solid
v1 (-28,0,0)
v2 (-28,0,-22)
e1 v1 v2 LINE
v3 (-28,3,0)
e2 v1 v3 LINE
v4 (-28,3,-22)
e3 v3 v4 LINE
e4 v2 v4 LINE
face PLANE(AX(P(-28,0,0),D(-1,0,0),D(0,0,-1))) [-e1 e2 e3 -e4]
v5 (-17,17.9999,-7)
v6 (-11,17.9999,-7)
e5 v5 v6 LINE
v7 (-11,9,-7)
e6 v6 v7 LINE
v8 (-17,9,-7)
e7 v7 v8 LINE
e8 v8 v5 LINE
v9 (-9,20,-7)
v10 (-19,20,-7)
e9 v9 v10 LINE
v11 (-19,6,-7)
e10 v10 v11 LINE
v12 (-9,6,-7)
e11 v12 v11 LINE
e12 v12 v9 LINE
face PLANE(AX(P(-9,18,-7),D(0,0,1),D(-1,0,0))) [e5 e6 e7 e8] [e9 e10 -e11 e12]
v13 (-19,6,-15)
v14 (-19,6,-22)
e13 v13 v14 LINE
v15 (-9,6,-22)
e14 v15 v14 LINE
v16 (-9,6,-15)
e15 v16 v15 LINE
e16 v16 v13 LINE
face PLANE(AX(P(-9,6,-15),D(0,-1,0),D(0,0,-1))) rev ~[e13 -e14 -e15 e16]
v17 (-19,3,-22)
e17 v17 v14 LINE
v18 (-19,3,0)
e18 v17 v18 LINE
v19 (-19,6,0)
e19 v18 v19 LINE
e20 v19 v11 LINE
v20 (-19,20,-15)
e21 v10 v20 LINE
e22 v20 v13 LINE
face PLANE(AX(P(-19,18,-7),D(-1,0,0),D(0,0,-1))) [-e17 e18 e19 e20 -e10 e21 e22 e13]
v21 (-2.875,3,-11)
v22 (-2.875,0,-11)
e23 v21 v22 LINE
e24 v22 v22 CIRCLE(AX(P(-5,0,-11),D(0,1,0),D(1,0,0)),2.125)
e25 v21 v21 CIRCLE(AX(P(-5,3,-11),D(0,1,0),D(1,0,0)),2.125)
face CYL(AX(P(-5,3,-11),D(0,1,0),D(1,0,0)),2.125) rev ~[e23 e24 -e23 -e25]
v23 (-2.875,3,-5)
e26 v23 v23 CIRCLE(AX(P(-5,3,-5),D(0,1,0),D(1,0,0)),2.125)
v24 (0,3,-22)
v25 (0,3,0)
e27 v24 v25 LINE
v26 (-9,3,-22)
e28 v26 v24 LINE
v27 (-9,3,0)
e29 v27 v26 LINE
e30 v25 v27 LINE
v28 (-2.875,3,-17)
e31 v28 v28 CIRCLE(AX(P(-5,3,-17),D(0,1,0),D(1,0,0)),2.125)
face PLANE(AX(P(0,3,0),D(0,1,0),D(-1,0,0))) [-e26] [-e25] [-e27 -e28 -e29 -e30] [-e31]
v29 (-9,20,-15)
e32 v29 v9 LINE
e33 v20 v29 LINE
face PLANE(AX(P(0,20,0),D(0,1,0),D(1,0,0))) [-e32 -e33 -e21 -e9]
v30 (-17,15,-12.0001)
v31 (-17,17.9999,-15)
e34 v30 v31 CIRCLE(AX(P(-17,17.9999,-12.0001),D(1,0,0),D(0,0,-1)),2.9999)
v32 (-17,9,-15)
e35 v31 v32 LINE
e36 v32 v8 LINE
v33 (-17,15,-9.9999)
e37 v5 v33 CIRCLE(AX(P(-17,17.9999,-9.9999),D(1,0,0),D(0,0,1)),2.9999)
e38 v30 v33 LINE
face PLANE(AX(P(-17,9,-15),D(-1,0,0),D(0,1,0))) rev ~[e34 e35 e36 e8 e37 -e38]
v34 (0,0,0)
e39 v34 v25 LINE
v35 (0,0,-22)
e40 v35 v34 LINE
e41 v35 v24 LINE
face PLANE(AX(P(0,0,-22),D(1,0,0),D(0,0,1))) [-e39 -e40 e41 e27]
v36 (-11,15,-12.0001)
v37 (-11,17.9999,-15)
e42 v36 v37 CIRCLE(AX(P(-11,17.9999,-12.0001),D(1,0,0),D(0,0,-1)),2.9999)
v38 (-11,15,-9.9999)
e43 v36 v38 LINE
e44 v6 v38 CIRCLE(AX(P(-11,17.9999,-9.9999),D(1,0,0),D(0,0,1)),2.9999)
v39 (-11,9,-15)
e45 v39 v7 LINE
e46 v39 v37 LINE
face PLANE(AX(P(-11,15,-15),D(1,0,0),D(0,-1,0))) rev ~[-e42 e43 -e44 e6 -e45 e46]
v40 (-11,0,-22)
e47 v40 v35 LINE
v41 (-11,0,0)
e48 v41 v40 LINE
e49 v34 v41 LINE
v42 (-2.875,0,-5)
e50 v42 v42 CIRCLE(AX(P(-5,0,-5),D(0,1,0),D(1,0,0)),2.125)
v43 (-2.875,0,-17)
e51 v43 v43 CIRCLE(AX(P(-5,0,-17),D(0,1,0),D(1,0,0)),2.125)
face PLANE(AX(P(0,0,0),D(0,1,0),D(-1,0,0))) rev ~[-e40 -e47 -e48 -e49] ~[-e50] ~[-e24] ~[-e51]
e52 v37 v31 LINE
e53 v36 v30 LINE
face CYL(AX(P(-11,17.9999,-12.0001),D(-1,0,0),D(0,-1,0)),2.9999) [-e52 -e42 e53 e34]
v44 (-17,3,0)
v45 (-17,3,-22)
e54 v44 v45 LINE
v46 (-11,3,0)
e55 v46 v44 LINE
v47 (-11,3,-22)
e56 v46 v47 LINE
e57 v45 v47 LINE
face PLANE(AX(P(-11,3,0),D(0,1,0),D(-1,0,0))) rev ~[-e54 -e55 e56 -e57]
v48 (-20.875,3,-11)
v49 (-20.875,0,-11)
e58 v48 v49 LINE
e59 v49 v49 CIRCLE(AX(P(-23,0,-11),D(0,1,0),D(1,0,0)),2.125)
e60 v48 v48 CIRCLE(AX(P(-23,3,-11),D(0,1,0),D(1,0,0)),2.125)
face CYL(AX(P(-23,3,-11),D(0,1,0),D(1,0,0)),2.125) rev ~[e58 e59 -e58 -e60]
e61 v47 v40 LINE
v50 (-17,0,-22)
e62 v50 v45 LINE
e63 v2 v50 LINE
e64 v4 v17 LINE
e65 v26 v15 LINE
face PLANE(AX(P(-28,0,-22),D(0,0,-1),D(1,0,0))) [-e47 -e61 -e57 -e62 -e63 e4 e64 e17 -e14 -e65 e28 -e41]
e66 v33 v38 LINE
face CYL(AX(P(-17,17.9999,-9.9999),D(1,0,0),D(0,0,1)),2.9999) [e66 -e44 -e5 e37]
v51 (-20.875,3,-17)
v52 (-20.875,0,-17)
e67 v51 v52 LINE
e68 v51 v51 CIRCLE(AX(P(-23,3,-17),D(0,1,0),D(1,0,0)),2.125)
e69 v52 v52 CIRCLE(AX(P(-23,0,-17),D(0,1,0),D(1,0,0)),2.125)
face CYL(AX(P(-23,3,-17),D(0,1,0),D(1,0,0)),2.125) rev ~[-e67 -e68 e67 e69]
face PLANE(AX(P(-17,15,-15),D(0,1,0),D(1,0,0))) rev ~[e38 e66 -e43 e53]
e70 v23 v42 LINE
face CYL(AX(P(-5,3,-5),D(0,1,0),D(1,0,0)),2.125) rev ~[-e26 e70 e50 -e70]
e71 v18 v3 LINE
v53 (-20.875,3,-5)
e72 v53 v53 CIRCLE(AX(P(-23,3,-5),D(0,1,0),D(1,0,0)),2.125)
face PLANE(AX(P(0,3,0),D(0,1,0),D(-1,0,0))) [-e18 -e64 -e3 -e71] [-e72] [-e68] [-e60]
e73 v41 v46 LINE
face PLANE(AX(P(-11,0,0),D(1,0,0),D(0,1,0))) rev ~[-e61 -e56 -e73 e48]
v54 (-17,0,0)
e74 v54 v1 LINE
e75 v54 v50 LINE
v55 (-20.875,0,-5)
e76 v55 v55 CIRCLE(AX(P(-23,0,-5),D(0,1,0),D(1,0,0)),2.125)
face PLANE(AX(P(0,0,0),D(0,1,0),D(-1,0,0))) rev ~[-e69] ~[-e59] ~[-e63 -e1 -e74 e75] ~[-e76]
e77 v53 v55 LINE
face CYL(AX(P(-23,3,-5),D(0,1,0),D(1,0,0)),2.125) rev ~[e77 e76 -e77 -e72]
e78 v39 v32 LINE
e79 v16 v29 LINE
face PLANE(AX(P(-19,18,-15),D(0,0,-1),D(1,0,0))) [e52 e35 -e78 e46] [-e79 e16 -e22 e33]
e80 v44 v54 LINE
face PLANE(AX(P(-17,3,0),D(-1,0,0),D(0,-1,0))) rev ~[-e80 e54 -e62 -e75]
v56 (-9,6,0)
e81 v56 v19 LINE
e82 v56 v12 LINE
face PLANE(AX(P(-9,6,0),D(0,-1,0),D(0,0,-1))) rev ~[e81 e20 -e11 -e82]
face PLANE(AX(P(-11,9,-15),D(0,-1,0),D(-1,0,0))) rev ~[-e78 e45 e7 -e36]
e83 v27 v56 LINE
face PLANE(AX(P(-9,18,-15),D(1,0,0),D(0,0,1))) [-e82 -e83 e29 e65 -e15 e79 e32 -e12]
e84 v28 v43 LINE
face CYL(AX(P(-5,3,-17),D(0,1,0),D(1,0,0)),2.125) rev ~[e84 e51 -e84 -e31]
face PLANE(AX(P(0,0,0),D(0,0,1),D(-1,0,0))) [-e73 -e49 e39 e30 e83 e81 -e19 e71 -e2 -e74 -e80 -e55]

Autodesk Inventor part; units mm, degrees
ref_plane "YZ Plane" through (0, 0, 0) normal (1, 0, 0) x (0, 1, 0)
ref_plane "XZ Plane" through (0, 0, 0) normal (0, 1, 0) x (-1, 0, 0)
ref_plane "XY Plane" through (0, 0, 0) normal (0, 0, 1) x (1, 0, 0)
sketch "Sketch1" plane through (0, 0, 0) normal (0, 1, 0) x (-1, 0, 0)
  line L0 (0, 0) -> (28, 0)
  line L1 (28, 0) -> (28, -22)
  line L2 (28, -22) -> (0, -22)
  line L3 (0, -22) -> (0, 0)
  dimension "d0" = 28
  dimension "d1" = 22
extrude "Extrusion1" add sketch "Sketch1" along normal blind 3
sketch "Sketch2" plane through (0, 3, 0) normal (0, 1, 0) x (1, 0, 0)
  line L0 (-17, 7) -> (-11, 7)
  line L1 (-11, 7) -> (-11, 15)
  line L2 (-11, 15) -> (-17, 15)
  line L3 (-17, 15) -> (-17, 7)
  line L4 (-17, 7) -> (-11, 15) construction
  line L5 (-11, 7) -> (-17, 15) construction
  point P0 (0, 0)
  point P1 (-14, 11)
  dimension "d4" = 6
  dimension "d5" = 8
sketch "Sketch3" plane through (0, 3, 0) normal (0, 1, 0) x (1, 0, 0)
  line L0 (-28, 22) -> (-28, 0) projected
  line L1 (-28, 11) -> (-23, 11)
  line L2 (0, 0) -> (0, 22) projected
  line L3 (0, 11) -> (-5, 11)
  circle A0 centre (-5, 11) radius 2.125
  dimension "d6" = 5
  dimension "d7" = 5
  dimension "d8" = 4.25
extrude "Extrusion2" cut sketch "Sketch3" against normal through all
pattern_linear "Rectangular Pattern1" count 3 spacing 6 along (0, 0, 1) count 2 spacing 18 along (-1, 0, 0) of "Extrusion2" first direction both ways yes
sketch "Sketch5" plane through (0, 3, 0) normal (0, 1, 0) x (1, 0, 0)
  line L0 (0, 22) -> (-28, 22) projected
  line L1 (-19, 0) -> (-9, 0)
  line L2 (-9, 0) -> (-9, 22)
  line L3 (-9, 22) -> (-19, 22)
  line L4 (-19, 22) -> (-19, 0)
  line L5 (-19, 0) -> (-9, 22) construction
  line L6 (-9, 0) -> (-19, 22) construction
  point P0 (0, 0)
  point P1 (-14, 11)
  dimension "d17" = 10
extrude "Extrusion3" add sketch "Sketch5" along normal blind 15
sketch "Sketch6" plane through (-28, 0, 0) normal (0, 0, 1) x (1, 0, 0)
  line L0 (19, 3) -> (17, 3)
  line L1 (9, 3) -> (9, 18) projected
  line L2 (9, 3) -> (11, 3)
  line L3 (0, 0) -> (28, 0) projected
  line L4 (17, 3) -> (11, 3)
  line L5 (11, 3) -> (11, 0)
  line L6 (11, 0) -> (17, 0)
  line L7 (17, 0) -> (17, 3)
  dimension "d20" = 2
  dimension "d21" = 2
extrude "Extrusion4" cut sketch "Sketch6" against normal through all
sketch "Sketch7" plane through (-9, 3, 0) normal (1, 0, 0) x (0, 0, -1)
  line L0 (0, 15) -> (7, 15)
  line L1 (22, 15) -> (0, 15) projected
  line L2 (22, 15) -> (15, 15)
  line L3 (0, 0) -> (0, 15) projected
  line L4 (7, 15) -> (0, 15)
  line L5 (0, 15) -> (0, 3)
  line L6 (0, 3) -> (7, 3)
  line L7 (7, 3) -> (7, 15)
  line L8 (22, 15) -> (15, 15)
  line L9 (15, 15) -> (15, 3)
  line L10 (15, 3) -> (22, 3)
  line L11 (22, 3) -> (22, 15)
  point P0 (0, -3)
  dimension "d24" = 7
  dimension "d25" = 7
  dimension "d26" = 12
extrude "Extrusion5" cut sketch "Sketch7" against normal through all
sketch "Sketch8" plane through (-9, 6, -15) normal (0, 0, -1) x (-1, 0, 0)
  line L0 (0, 12) -> (10, 12) projected
  line L1 (5, 12) -> (5, 6)
  line L2 (10, 12) -> (10, 0) projected
  line L3 (10, 6) -> (6, 6)
  line L4 (0, 0) -> (0, 12) projected
  line L5 (0, 6) -> (4, 6)
  line L6 (2, 3) -> (8, 3)
  line L7 (8, 3) -> (8, 9)
  line L8 (8, 9) -> (2, 9)
  line L9 (2, 9) -> (2, 3)
  line L10 (2, 3) -> (8, 9) construction
  line L11 (8, 3) -> (2, 9) construction
  point P0 (-9, -6)
  dimension "d29" = 6
  dimension "d30" = 4
  dimension "d31" = 4
extrude "Extrusion6" cut sketch "Sketch8" against normal through all contours L8 L7 L6 L9
fillet "Fillet1" radius 3 1 edges at (-14, 15, -7)
fillet "Fillet2" radius 3 1 edges at (-14, 15, -15)
sketch "Sketch9" plane through (0, 18, 0) normal (0, 1, 0) x (1, 0, 0)
  line L0 (-9, 7) -> (-19, 7)
  line L1 (-19, 7) -> (-19, 15)
  line L2 (-19, 15) -> (-9, 15)
  line L3 (-9, 15) -> (-9, 7)
  line L4 (-9, 7) -> (-19, 15) construction
  line L5 (-19, 7) -> (-9, 15) construction
  point P0 (0, 0)
  point P1 (-14, 11)
extrude "Extrusion7" add sketch "Sketch9" along normal blind 2
properties part number "ClawAttach"
